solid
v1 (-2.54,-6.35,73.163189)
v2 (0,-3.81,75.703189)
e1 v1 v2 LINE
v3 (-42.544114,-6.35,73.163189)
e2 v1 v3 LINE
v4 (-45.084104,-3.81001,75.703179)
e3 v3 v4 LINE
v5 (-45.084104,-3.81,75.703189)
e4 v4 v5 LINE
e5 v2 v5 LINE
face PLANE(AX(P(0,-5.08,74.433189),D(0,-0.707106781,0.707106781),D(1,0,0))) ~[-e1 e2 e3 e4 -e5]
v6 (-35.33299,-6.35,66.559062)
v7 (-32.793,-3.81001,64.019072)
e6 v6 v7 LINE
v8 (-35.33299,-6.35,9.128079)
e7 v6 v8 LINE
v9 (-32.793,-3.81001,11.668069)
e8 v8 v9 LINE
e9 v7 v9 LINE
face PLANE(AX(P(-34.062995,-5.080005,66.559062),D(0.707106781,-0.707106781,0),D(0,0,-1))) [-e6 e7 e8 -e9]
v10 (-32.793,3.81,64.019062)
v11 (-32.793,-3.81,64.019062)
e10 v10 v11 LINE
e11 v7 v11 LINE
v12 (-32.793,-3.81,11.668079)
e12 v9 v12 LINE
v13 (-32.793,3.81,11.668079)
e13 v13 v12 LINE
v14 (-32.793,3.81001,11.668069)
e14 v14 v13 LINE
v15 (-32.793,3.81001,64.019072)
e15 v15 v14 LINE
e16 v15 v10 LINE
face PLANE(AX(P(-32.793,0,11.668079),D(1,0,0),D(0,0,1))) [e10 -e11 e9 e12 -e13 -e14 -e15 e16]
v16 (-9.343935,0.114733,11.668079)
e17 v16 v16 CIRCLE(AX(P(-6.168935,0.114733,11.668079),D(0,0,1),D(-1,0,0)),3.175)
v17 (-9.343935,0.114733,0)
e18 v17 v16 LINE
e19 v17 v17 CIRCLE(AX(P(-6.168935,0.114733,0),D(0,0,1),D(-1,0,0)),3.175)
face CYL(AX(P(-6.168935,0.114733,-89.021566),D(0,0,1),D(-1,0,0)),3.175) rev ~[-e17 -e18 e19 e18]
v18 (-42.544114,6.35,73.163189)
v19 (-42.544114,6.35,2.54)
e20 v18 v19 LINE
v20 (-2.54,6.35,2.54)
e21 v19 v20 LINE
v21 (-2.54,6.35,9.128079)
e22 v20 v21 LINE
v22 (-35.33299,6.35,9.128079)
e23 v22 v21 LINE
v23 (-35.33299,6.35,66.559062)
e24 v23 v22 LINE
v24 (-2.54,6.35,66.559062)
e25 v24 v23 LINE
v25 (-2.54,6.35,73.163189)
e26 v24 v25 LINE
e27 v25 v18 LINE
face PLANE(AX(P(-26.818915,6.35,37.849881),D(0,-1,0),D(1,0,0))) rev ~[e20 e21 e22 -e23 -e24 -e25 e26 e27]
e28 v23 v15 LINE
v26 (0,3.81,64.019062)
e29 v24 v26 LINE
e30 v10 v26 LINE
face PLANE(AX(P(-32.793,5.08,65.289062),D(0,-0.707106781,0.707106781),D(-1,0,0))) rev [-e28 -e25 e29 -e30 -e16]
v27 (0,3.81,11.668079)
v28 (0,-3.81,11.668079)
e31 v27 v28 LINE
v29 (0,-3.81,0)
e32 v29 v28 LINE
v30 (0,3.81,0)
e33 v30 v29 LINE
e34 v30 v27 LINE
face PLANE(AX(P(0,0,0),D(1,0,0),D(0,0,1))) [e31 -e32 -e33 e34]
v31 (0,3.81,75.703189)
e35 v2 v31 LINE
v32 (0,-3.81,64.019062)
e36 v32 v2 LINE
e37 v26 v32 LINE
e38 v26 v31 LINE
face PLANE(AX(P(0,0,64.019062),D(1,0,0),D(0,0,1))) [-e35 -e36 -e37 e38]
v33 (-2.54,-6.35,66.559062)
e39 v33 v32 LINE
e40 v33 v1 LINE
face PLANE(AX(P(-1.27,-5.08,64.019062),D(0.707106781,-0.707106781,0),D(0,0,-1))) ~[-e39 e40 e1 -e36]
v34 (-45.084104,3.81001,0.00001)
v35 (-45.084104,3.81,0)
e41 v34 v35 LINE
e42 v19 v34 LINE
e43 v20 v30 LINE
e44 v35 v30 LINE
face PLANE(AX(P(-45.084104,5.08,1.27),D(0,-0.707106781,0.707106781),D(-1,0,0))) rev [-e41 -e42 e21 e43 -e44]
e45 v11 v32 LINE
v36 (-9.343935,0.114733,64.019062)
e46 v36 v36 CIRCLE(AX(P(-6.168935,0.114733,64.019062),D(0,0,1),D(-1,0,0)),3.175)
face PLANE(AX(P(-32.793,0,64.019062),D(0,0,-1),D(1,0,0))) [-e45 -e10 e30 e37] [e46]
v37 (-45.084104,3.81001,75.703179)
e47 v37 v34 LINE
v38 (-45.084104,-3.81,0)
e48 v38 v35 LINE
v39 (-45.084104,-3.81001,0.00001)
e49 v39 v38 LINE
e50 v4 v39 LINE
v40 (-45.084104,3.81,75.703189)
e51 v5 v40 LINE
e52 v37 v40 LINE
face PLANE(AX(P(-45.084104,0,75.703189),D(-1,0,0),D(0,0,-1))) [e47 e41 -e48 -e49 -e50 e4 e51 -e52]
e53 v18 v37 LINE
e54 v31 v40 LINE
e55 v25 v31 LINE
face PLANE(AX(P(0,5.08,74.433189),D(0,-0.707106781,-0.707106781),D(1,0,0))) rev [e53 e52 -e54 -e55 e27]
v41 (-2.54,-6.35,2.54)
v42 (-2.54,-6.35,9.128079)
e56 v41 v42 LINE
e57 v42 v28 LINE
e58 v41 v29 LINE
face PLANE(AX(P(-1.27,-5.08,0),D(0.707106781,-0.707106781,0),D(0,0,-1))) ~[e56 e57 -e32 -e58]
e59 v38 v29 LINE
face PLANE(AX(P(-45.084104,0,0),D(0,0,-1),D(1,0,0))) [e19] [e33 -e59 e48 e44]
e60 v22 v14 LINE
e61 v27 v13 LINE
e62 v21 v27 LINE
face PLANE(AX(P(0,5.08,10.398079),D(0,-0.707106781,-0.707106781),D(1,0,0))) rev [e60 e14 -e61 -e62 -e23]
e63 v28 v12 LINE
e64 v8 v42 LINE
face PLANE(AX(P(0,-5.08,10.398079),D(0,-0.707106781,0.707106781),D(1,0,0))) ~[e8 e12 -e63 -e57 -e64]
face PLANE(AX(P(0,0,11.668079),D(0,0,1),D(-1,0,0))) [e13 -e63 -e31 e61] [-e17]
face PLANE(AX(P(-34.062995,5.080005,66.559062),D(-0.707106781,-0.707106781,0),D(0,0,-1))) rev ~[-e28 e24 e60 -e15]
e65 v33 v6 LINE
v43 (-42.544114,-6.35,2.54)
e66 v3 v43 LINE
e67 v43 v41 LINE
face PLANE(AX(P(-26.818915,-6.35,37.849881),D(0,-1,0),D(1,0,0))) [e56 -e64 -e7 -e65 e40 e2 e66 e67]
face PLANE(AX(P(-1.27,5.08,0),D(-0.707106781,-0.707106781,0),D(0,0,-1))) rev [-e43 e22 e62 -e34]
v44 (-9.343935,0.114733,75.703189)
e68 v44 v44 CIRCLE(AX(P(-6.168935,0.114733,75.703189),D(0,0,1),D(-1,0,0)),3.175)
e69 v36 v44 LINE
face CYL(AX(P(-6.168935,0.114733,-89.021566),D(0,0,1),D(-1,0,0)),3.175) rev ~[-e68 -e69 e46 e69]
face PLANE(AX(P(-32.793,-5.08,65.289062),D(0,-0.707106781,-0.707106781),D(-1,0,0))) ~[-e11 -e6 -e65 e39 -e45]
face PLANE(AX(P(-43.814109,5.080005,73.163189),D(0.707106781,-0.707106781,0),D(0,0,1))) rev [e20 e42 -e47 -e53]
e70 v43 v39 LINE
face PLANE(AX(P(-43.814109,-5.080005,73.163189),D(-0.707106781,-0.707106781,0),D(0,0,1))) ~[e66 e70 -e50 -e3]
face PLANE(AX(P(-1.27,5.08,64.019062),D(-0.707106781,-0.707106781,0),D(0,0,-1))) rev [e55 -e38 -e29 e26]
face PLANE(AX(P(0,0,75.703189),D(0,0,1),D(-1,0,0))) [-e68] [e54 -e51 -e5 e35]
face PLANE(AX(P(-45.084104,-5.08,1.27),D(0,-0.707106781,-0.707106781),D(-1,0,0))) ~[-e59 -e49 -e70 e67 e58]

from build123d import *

# Parameters (mm, degrees)
F1_DEPTH = 6.35
F3_D     = 6.35
F4_SIZE  = 2.54
F5_SIZE  = 2.54
F6_SIZE  = 2.53999


# Not quite as in the source:
# - a fillet or chamfer is up to 0.001 mm smaller than in the source, because OpenCascade refuses the exact size


with BuildPart() as f1:
    # F0 (on Front) → F1 (new body, symmetric)
    with BuildSketch(Plane.XZ):
        Polygon((-45.0841039419, 0), (0, 0), (0, 11.6680786014), (-32.7930003405, 11.6680786014), (-32.7930003405, 64.019061625), (0, 64.019061625), (0, 75.703188777), (-45.0841039419, 75.703188777), align=None)
    extrude(amount=F1_DEPTH, both=True)

    # F3 (through all)
    with Locations(Plane(origin=(0, 0, 0), x_dir=(1, 0, 0), z_dir=(0, 0, -1))):
        with Locations((-6.1689345166, -0.1147333004)):
            Hole(F3_D / 2)

    # F4
    f4_edges = [f1.edges().sort_by_distance(p)[0] for p in [
        (-22.542052, -6.35, 75.703189),
        (-22.542052, 6.35, 75.703189),
        (-16.3965, -6.35, 64.019062),
        (0, -6.35, 69.861125),
        (0, 6.35, 69.861125),
        (-16.3965, 6.35, 64.019062),
    ]]
    chamfer(f4_edges, length=F4_SIZE)

    # F5
    f5_edges = [f1.edges().sort_by_distance(p)[0] for p in [
        (-22.542052, 6.35, 0),
        (0, -6.35, 5.834039),
        (-22.542052, -6.35, 0),
        (-16.3965, -6.35, 11.668079),
        (0, 6.35, 5.834039),
        (-16.3965, 6.35, 11.668079),
    ]]
    chamfer(f5_edges, length=F5_SIZE)

    # F6 (size 2.54 in the source; OpenCascade refuses exactly that, so slightly less here)
    f6_edges = [f1.edges().sort_by_distance(p)[0] for p in [
        (-45.084104, 6.35, 37.851594),
        (-32.793, -6.35, 37.84357),
        (-32.793, 6.35, 37.84357),
        (-45.084104, -6.35, 37.851594),
    ]]
    chamfer(f6_edges, length=F6_SIZE)


solid = f1.part
